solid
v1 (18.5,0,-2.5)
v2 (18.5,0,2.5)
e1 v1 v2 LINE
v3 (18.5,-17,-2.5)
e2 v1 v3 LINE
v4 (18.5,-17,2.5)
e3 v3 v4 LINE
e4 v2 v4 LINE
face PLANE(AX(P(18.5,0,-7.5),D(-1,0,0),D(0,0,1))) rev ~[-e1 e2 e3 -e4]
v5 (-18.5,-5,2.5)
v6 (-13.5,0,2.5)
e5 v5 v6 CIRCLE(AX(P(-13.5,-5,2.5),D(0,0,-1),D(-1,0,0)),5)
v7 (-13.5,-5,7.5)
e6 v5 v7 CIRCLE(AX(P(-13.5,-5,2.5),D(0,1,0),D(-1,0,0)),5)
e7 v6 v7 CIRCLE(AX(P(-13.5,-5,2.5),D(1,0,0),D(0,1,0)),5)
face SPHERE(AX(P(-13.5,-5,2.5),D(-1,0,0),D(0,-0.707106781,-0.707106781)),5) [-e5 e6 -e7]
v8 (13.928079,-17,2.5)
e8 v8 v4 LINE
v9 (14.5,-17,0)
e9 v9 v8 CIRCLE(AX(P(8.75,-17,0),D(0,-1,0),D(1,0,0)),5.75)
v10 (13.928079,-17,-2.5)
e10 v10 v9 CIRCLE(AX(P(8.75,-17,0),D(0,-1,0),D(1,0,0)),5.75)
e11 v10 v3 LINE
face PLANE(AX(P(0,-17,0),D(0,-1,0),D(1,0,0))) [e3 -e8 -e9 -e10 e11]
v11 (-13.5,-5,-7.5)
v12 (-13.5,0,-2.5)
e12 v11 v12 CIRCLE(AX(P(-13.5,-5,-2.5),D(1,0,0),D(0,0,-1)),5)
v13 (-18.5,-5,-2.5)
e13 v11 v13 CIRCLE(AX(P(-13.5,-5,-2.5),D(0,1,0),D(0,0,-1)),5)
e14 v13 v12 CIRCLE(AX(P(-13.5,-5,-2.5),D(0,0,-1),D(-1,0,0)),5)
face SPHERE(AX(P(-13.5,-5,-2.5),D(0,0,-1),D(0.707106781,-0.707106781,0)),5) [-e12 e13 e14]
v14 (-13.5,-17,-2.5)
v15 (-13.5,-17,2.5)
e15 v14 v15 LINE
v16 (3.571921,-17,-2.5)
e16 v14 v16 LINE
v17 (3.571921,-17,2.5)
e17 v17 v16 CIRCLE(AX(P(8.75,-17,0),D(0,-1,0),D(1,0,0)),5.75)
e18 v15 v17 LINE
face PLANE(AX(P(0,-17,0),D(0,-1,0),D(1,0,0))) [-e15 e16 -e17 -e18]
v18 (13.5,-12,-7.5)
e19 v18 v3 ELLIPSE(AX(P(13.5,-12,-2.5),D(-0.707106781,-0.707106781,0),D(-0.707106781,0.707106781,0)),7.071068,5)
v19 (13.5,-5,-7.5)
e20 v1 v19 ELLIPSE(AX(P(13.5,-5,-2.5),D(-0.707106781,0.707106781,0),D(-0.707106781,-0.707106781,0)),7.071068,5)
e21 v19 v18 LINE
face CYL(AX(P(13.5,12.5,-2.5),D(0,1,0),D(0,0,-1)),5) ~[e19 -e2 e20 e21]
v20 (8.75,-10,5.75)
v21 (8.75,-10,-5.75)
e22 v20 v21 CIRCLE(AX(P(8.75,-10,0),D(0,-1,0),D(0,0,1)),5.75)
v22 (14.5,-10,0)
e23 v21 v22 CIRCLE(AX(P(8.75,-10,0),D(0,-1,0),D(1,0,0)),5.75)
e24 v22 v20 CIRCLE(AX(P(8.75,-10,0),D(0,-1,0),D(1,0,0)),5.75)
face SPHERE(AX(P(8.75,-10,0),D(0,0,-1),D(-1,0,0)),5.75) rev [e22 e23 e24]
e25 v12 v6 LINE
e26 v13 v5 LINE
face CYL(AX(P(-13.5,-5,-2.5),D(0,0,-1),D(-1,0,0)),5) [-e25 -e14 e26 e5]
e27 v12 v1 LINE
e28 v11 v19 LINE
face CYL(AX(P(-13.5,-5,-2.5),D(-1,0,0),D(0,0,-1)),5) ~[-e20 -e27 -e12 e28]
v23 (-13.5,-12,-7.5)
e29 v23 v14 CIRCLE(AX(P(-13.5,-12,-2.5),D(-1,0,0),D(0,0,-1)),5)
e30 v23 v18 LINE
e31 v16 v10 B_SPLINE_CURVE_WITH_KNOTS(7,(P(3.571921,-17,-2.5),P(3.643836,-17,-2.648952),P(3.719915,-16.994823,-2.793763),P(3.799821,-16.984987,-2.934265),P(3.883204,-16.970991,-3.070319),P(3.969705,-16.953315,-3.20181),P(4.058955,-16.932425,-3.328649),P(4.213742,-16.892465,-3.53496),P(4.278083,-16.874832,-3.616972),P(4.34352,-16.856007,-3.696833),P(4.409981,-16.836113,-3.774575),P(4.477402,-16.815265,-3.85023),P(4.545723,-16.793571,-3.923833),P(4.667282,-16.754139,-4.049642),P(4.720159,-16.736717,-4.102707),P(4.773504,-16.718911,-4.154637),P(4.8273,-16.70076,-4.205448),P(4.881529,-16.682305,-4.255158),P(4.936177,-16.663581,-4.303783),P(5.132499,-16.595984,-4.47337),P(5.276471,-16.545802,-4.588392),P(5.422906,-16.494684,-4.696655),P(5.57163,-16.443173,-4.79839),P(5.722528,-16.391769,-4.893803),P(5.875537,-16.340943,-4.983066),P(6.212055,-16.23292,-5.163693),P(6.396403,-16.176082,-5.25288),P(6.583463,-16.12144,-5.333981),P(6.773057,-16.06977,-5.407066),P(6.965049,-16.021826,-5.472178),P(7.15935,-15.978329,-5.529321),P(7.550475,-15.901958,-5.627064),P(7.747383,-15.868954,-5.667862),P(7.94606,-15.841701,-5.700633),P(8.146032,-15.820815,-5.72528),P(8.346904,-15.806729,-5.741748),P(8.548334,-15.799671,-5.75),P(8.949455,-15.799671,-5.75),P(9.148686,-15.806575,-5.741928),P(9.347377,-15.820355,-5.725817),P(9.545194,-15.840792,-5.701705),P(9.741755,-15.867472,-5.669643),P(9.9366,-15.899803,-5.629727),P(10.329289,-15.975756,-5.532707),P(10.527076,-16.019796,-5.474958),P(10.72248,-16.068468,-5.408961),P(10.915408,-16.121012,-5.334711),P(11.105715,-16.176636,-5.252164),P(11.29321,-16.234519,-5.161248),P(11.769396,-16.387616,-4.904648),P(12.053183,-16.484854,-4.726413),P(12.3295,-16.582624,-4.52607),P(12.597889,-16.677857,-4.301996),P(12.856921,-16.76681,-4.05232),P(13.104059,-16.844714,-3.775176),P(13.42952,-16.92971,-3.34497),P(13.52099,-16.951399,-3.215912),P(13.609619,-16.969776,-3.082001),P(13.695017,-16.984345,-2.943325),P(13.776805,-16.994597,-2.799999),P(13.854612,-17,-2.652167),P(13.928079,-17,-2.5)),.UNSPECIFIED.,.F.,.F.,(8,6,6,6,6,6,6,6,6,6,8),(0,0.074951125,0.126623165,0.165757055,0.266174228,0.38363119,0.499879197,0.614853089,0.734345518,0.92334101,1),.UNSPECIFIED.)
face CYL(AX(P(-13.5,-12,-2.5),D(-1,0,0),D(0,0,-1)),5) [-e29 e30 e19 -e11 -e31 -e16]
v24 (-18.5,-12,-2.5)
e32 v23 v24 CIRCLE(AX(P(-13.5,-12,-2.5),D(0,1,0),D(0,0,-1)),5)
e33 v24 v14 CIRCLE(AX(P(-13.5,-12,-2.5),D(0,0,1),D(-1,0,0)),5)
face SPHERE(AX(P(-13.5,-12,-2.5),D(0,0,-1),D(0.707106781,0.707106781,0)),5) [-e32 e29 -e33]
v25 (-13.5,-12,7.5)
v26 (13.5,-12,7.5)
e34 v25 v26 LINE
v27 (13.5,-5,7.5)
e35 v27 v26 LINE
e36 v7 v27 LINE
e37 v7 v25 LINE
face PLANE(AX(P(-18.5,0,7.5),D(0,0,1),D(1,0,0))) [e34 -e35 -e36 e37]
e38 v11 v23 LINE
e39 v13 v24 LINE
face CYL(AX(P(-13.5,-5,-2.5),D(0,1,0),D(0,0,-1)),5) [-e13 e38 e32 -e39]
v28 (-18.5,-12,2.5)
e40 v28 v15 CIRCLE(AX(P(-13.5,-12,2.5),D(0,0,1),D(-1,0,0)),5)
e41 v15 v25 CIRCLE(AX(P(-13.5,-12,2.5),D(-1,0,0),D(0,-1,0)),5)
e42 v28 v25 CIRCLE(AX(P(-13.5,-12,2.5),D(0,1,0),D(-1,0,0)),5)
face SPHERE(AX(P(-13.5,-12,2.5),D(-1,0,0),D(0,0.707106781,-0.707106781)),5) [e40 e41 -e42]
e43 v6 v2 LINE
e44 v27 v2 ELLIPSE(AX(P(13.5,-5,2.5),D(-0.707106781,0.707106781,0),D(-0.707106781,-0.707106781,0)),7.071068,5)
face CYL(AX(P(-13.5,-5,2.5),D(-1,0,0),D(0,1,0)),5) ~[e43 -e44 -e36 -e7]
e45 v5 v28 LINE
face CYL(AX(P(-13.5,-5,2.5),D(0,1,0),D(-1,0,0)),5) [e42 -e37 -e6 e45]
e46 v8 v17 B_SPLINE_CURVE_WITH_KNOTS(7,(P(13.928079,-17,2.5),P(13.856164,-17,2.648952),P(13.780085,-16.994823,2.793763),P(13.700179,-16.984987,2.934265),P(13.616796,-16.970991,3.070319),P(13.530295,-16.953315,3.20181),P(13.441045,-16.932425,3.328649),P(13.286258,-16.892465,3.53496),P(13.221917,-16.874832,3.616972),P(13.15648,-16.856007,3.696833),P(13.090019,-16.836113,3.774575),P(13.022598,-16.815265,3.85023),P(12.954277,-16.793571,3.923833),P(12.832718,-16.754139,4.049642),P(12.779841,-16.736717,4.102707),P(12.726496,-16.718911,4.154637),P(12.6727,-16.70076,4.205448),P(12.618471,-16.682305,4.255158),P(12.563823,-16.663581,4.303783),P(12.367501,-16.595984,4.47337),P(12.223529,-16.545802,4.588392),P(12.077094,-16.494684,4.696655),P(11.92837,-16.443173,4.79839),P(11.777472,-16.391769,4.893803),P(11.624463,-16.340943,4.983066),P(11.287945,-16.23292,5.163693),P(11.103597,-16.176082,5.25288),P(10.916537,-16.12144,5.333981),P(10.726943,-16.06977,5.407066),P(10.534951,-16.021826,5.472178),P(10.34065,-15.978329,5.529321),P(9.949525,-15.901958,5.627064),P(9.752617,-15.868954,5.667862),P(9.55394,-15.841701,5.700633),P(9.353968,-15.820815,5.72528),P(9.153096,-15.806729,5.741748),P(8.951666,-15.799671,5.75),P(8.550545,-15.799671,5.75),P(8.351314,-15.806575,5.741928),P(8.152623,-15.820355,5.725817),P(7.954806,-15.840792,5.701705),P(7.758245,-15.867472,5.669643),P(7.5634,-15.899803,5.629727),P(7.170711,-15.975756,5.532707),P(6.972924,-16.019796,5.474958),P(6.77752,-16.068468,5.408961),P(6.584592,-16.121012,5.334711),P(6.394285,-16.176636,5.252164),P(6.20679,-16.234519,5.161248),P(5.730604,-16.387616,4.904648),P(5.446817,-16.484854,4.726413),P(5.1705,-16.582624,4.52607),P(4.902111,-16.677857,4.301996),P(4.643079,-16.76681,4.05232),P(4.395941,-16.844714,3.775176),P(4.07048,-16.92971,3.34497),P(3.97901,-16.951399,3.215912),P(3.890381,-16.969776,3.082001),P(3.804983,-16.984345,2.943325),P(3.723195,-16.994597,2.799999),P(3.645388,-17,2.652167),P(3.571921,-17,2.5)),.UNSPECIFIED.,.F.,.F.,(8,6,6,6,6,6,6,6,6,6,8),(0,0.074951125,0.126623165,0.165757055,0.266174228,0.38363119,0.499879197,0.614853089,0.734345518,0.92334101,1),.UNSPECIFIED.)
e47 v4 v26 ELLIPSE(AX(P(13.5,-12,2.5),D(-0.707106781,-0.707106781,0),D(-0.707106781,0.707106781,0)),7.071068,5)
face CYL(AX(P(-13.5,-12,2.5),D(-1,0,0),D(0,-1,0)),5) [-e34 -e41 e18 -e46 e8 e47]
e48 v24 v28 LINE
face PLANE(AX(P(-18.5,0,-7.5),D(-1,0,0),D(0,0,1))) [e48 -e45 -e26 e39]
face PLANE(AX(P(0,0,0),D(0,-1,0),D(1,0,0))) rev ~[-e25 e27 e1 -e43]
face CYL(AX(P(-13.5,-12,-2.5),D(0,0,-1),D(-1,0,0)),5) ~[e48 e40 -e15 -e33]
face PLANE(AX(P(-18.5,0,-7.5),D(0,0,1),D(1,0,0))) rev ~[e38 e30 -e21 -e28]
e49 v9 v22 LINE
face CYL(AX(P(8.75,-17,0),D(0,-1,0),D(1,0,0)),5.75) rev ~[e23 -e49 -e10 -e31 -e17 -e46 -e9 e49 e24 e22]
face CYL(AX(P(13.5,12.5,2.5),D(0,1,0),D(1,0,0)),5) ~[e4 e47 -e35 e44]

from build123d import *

# Parameters (mm, degrees)
F0_W         = 37
F0_H         = 15
F1_DEPTH     = 17
F2_R         = 5.75
F3_DEPTH     = 7
F6_T1_DEPTH  = 44.5
F6_T3_DEPTH  = 42
F6_T5_DEPTH  = 7
F6_T7_DEPTH  = 5
F6_S11_W     = 5
F6_S11_H     = 5
F6_T12_DEPTH = 5
F6_S17_W     = 5
F6_S17_H     = 5
F6_T18_DEPTH = 5
F6_S23_W     = 5
F6_S23_H     = 5
F6_T24_DEPTH = 5
F6_S29_W     = 5
F6_S29_H     = 5
F6_T30_DEPTH = 5


# Not quite as in the source:
# - a fillet or chamfer that OpenCascade refuses, or shapes differently, is made with other operations: its cross-section is extruded or revolved along the edge and cut away or added


with BuildPart() as f1:
    # F0 (on Front) → F1 (new body)
    with BuildSketch(Plane.XZ):
        Rectangle(F0_W, F0_H)
    extrude(amount=F1_DEPTH)

    # F2 (on face) → F3 (cut)
    with BuildSketch(Plane.XZ.offset(17)):
        with Locations((8.75, 0)):
            Circle(F2_R)
    extrude(amount=-F3_DEPTH, mode=Mode.SUBTRACT)

    # F4 (on face) → F5 (revolve, cut)
    with BuildSketch(Plane.XZ.offset(10)):
        with BuildLine():
            Line((8.75, 0), (8.75, 5.75))
            ThreePointArc((8.75, 5.75), (3, 0), (8.75, -5.75))
            Line((8.75, -5.75), (8.75, 0))
        make_face()
    revolve(axis=Axis((8.75, -10, 2.875), (0, 0, 1)), mode=Mode.SUBTRACT)

    # F6: fillet of radius 5 on 10 edges, made by hand

    # F6_s2 → F6_t1 (cut)
    with BuildSketch(Plane.YZ.offset(-13.5)):
        with BuildLine():
            ThreePointArc((-17, 2.5), (-15.5355339059, 6.0355339059), (-12, 7.5))
            Line((-12, 7.5), (-17, 7.5))
            Line((-17, 7.5), (-17, 2.5))
        make_face()
        with BuildLine():
            ThreePointArc((-12, -7.5), (-15.5355339059, -6.0355339059), (-17, -2.5))
            Line((-17, -2.5), (-17, -7.5))
            Line((-17, -7.5), (-12, -7.5))
        make_face()
        with BuildLine():
            ThreePointArc((0, 2.5), (-1.4644660941, 6.0355339059), (-5, 7.5))
            Line((-5, 7.5), (0, 7.5))
            Line((0, 7.5), (0, 2.5))
        make_face()
        with BuildLine():
            ThreePointArc((-5, -7.5), (-1.4644660941, -6.0355339059), (0, -2.5))
            Line((0, -2.5), (0, -7.5))
            Line((0, -7.5), (-5, -7.5))
        make_face()
    extrude(amount=F6_T1_DEPTH, mode=Mode.SUBTRACT)

    # F6_s4 → F6_t3 (cut)
    with BuildSketch(Plane.XZ.offset(-12.5)):
        with BuildLine():
            ThreePointArc((18.5, 2.5), (17.0355339059, 6.0355339059), (13.5, 7.5))
            Line((13.5, 7.5), (18.5, 7.5))
            Line((18.5, 7.5), (18.5, 2.5))
        make_face()
        with BuildLine():
            ThreePointArc((13.5, -7.5), (17.0355339059, -6.0355339059), (18.5, -2.5))
            Line((18.5, -2.5), (18.5, -7.5))
            Line((18.5, -7.5), (13.5, -7.5))
        make_face()
    extrude(amount=F6_T3_DEPTH, mode=Mode.SUBTRACT)

    # F6_s6 → F6_t5 (cut)
    with BuildSketch(Plane.XZ.offset(5)):
        with BuildLine():
            ThreePointArc((-18.5, 2.5), (-17.0355339059, 6.0355339059), (-13.5, 7.5))
            Line((-13.5, 7.5), (-18.5, 7.5))
            Line((-18.5, 7.5), (-18.5, 2.5))
        make_face()
        with BuildLine():
            ThreePointArc((-13.5, -7.5), (-17.0355339059, -6.0355339059), (-18.5, -2.5))
            Line((-18.5, -2.5), (-18.5, -7.5))
            Line((-18.5, -7.5), (-13.5, -7.5))
        make_face()
    extrude(amount=F6_T5_DEPTH, mode=Mode.SUBTRACT)

    # F6_s8 → F6_t7 (cut)
    with BuildSketch(Plane.XY.offset(-2.5)):
        with BuildLine():
            ThreePointArc((-18.5, -12), (-17.0355339059, -15.5355339059), (-13.5, -17))
            Line((-13.5, -17), (-18.5, -17))
            Line((-18.5, -17), (-18.5, -12))
        make_face()
        with BuildLine():
            ThreePointArc((-18.5, -5), (-17.0355339059, -1.4644660941), (-13.5, 0))
            Line((-13.5, 0), (-18.5, 0))
            Line((-18.5, 0), (-18.5, -5))
        make_face()
    extrude(amount=F6_T7_DEPTH, mode=Mode.SUBTRACT)


with BuildPart() as f6_tool10:
    # F6_s11 → F6_t12 (new body)
    with BuildSketch(Plane.YZ.offset(-13.5)):
        with Locations((-14.5, 5)):
            Rectangle(F6_S11_W, F6_S11_H)
    extrude(amount=-F6_T12_DEPTH)

    # F6_s13 → F6_t14 (revolve, cut)
    with BuildSketch(Plane(origin=(-13.5, -12, 2.5), x_dir=(0, 0.7071067812, -0.7071067812), z_dir=(0, 0.7071067812, 0.7071067812))):
        with BuildLine():
            ThreePointArc((0, -5), (5, 0), (0, 5))
            Line((0, 5), (0, -5))
        make_face()
    revolve(axis=Axis((-13.5, -12, 2.5), (-1, 0, 0)), mode=Mode.SUBTRACT)


with BuildPart() as f1_1:
    add(f1.part)

    # F6_t9: cut F6_tool10
    add(f6_tool10.part, mode=Mode.SUBTRACT)


with BuildPart() as f6_tool16:
    # F6_s17 → F6_t18 (new body)
    with BuildSketch(Plane.XY.offset(-2.5)):
        with Locations((-16, -14.5)):
            Rectangle(F6_S17_W, F6_S17_H)
    extrude(amount=-F6_T18_DEPTH)

    # F6_s19 → F6_t20 (revolve, cut)
    with BuildSketch(Plane(origin=(-13.5, -12, -2.5), x_dir=(0.7071067812, 0.7071067812, 0), z_dir=(-0.7071067812, 0.7071067812, 0))):
        with BuildLine():
            ThreePointArc((0, -5), (5, 0), (0, 5))
            Line((0, 5), (0, -5))
        make_face()
    revolve(axis=Axis((-13.5, -12, -2.5), (0, 0, -1)), mode=Mode.SUBTRACT)


with BuildPart() as f1_2:
    add(f1_1.part)

    # F6_t15: cut F6_tool16
    add(f6_tool16.part, mode=Mode.SUBTRACT)


with BuildPart() as f6_tool22:
    # F6_s23 → F6_t24 (new body)
    with BuildSketch(Plane.YZ.offset(-13.5)):
        with Locations((-2.5, 5)):
            Rectangle(F6_S23_W, F6_S23_H)
    extrude(amount=-F6_T24_DEPTH)

    # F6_s25 → F6_t26 (revolve, cut)
    with BuildSketch(Plane(origin=(-13.5, -5, 2.5), x_dir=(0, -0.7071067812, -0.7071067812), z_dir=(0, 0.7071067812, -0.7071067812))):
        with BuildLine():
            ThreePointArc((0, -5), (5, 0), (0, 5))
            Line((0, 5), (0, -5))
        make_face()
    revolve(axis=Axis((-13.5, -5, 2.5), (-1, 0, 0)), mode=Mode.SUBTRACT)


with BuildPart() as f1_3:
    add(f1_2.part)

    # F6_t21: cut F6_tool22
    add(f6_tool22.part, mode=Mode.SUBTRACT)


with BuildPart() as f6_tool28:
    # F6_s29 → F6_t30 (new body)
    with BuildSketch(Plane.XY.offset(-2.5)):
        with Locations((-16, -2.5)):
            Rectangle(F6_S29_W, F6_S29_H)
    extrude(amount=-F6_T30_DEPTH)

    # F6_s31 → F6_t32 (revolve, cut)
    with BuildSketch(Plane(origin=(-13.5, -5, -2.5), x_dir=(0.7071067812, -0.7071067812, 0), z_dir=(0.7071067812, 0.7071067812, 0))):
        with BuildLine():
            ThreePointArc((0, -5), (5, 0), (0, 5))
            Line((0, 5), (0, -5))
        make_face()
    revolve(axis=Axis((-13.5, -5, -2.5), (0, 0, -1)), mode=Mode.SUBTRACT)


with BuildPart() as f1_4:
    add(f1_3.part)

    # F6_t27: cut F6_tool28
    add(f6_tool28.part, mode=Mode.SUBTRACT)


solid = f1_4.part
